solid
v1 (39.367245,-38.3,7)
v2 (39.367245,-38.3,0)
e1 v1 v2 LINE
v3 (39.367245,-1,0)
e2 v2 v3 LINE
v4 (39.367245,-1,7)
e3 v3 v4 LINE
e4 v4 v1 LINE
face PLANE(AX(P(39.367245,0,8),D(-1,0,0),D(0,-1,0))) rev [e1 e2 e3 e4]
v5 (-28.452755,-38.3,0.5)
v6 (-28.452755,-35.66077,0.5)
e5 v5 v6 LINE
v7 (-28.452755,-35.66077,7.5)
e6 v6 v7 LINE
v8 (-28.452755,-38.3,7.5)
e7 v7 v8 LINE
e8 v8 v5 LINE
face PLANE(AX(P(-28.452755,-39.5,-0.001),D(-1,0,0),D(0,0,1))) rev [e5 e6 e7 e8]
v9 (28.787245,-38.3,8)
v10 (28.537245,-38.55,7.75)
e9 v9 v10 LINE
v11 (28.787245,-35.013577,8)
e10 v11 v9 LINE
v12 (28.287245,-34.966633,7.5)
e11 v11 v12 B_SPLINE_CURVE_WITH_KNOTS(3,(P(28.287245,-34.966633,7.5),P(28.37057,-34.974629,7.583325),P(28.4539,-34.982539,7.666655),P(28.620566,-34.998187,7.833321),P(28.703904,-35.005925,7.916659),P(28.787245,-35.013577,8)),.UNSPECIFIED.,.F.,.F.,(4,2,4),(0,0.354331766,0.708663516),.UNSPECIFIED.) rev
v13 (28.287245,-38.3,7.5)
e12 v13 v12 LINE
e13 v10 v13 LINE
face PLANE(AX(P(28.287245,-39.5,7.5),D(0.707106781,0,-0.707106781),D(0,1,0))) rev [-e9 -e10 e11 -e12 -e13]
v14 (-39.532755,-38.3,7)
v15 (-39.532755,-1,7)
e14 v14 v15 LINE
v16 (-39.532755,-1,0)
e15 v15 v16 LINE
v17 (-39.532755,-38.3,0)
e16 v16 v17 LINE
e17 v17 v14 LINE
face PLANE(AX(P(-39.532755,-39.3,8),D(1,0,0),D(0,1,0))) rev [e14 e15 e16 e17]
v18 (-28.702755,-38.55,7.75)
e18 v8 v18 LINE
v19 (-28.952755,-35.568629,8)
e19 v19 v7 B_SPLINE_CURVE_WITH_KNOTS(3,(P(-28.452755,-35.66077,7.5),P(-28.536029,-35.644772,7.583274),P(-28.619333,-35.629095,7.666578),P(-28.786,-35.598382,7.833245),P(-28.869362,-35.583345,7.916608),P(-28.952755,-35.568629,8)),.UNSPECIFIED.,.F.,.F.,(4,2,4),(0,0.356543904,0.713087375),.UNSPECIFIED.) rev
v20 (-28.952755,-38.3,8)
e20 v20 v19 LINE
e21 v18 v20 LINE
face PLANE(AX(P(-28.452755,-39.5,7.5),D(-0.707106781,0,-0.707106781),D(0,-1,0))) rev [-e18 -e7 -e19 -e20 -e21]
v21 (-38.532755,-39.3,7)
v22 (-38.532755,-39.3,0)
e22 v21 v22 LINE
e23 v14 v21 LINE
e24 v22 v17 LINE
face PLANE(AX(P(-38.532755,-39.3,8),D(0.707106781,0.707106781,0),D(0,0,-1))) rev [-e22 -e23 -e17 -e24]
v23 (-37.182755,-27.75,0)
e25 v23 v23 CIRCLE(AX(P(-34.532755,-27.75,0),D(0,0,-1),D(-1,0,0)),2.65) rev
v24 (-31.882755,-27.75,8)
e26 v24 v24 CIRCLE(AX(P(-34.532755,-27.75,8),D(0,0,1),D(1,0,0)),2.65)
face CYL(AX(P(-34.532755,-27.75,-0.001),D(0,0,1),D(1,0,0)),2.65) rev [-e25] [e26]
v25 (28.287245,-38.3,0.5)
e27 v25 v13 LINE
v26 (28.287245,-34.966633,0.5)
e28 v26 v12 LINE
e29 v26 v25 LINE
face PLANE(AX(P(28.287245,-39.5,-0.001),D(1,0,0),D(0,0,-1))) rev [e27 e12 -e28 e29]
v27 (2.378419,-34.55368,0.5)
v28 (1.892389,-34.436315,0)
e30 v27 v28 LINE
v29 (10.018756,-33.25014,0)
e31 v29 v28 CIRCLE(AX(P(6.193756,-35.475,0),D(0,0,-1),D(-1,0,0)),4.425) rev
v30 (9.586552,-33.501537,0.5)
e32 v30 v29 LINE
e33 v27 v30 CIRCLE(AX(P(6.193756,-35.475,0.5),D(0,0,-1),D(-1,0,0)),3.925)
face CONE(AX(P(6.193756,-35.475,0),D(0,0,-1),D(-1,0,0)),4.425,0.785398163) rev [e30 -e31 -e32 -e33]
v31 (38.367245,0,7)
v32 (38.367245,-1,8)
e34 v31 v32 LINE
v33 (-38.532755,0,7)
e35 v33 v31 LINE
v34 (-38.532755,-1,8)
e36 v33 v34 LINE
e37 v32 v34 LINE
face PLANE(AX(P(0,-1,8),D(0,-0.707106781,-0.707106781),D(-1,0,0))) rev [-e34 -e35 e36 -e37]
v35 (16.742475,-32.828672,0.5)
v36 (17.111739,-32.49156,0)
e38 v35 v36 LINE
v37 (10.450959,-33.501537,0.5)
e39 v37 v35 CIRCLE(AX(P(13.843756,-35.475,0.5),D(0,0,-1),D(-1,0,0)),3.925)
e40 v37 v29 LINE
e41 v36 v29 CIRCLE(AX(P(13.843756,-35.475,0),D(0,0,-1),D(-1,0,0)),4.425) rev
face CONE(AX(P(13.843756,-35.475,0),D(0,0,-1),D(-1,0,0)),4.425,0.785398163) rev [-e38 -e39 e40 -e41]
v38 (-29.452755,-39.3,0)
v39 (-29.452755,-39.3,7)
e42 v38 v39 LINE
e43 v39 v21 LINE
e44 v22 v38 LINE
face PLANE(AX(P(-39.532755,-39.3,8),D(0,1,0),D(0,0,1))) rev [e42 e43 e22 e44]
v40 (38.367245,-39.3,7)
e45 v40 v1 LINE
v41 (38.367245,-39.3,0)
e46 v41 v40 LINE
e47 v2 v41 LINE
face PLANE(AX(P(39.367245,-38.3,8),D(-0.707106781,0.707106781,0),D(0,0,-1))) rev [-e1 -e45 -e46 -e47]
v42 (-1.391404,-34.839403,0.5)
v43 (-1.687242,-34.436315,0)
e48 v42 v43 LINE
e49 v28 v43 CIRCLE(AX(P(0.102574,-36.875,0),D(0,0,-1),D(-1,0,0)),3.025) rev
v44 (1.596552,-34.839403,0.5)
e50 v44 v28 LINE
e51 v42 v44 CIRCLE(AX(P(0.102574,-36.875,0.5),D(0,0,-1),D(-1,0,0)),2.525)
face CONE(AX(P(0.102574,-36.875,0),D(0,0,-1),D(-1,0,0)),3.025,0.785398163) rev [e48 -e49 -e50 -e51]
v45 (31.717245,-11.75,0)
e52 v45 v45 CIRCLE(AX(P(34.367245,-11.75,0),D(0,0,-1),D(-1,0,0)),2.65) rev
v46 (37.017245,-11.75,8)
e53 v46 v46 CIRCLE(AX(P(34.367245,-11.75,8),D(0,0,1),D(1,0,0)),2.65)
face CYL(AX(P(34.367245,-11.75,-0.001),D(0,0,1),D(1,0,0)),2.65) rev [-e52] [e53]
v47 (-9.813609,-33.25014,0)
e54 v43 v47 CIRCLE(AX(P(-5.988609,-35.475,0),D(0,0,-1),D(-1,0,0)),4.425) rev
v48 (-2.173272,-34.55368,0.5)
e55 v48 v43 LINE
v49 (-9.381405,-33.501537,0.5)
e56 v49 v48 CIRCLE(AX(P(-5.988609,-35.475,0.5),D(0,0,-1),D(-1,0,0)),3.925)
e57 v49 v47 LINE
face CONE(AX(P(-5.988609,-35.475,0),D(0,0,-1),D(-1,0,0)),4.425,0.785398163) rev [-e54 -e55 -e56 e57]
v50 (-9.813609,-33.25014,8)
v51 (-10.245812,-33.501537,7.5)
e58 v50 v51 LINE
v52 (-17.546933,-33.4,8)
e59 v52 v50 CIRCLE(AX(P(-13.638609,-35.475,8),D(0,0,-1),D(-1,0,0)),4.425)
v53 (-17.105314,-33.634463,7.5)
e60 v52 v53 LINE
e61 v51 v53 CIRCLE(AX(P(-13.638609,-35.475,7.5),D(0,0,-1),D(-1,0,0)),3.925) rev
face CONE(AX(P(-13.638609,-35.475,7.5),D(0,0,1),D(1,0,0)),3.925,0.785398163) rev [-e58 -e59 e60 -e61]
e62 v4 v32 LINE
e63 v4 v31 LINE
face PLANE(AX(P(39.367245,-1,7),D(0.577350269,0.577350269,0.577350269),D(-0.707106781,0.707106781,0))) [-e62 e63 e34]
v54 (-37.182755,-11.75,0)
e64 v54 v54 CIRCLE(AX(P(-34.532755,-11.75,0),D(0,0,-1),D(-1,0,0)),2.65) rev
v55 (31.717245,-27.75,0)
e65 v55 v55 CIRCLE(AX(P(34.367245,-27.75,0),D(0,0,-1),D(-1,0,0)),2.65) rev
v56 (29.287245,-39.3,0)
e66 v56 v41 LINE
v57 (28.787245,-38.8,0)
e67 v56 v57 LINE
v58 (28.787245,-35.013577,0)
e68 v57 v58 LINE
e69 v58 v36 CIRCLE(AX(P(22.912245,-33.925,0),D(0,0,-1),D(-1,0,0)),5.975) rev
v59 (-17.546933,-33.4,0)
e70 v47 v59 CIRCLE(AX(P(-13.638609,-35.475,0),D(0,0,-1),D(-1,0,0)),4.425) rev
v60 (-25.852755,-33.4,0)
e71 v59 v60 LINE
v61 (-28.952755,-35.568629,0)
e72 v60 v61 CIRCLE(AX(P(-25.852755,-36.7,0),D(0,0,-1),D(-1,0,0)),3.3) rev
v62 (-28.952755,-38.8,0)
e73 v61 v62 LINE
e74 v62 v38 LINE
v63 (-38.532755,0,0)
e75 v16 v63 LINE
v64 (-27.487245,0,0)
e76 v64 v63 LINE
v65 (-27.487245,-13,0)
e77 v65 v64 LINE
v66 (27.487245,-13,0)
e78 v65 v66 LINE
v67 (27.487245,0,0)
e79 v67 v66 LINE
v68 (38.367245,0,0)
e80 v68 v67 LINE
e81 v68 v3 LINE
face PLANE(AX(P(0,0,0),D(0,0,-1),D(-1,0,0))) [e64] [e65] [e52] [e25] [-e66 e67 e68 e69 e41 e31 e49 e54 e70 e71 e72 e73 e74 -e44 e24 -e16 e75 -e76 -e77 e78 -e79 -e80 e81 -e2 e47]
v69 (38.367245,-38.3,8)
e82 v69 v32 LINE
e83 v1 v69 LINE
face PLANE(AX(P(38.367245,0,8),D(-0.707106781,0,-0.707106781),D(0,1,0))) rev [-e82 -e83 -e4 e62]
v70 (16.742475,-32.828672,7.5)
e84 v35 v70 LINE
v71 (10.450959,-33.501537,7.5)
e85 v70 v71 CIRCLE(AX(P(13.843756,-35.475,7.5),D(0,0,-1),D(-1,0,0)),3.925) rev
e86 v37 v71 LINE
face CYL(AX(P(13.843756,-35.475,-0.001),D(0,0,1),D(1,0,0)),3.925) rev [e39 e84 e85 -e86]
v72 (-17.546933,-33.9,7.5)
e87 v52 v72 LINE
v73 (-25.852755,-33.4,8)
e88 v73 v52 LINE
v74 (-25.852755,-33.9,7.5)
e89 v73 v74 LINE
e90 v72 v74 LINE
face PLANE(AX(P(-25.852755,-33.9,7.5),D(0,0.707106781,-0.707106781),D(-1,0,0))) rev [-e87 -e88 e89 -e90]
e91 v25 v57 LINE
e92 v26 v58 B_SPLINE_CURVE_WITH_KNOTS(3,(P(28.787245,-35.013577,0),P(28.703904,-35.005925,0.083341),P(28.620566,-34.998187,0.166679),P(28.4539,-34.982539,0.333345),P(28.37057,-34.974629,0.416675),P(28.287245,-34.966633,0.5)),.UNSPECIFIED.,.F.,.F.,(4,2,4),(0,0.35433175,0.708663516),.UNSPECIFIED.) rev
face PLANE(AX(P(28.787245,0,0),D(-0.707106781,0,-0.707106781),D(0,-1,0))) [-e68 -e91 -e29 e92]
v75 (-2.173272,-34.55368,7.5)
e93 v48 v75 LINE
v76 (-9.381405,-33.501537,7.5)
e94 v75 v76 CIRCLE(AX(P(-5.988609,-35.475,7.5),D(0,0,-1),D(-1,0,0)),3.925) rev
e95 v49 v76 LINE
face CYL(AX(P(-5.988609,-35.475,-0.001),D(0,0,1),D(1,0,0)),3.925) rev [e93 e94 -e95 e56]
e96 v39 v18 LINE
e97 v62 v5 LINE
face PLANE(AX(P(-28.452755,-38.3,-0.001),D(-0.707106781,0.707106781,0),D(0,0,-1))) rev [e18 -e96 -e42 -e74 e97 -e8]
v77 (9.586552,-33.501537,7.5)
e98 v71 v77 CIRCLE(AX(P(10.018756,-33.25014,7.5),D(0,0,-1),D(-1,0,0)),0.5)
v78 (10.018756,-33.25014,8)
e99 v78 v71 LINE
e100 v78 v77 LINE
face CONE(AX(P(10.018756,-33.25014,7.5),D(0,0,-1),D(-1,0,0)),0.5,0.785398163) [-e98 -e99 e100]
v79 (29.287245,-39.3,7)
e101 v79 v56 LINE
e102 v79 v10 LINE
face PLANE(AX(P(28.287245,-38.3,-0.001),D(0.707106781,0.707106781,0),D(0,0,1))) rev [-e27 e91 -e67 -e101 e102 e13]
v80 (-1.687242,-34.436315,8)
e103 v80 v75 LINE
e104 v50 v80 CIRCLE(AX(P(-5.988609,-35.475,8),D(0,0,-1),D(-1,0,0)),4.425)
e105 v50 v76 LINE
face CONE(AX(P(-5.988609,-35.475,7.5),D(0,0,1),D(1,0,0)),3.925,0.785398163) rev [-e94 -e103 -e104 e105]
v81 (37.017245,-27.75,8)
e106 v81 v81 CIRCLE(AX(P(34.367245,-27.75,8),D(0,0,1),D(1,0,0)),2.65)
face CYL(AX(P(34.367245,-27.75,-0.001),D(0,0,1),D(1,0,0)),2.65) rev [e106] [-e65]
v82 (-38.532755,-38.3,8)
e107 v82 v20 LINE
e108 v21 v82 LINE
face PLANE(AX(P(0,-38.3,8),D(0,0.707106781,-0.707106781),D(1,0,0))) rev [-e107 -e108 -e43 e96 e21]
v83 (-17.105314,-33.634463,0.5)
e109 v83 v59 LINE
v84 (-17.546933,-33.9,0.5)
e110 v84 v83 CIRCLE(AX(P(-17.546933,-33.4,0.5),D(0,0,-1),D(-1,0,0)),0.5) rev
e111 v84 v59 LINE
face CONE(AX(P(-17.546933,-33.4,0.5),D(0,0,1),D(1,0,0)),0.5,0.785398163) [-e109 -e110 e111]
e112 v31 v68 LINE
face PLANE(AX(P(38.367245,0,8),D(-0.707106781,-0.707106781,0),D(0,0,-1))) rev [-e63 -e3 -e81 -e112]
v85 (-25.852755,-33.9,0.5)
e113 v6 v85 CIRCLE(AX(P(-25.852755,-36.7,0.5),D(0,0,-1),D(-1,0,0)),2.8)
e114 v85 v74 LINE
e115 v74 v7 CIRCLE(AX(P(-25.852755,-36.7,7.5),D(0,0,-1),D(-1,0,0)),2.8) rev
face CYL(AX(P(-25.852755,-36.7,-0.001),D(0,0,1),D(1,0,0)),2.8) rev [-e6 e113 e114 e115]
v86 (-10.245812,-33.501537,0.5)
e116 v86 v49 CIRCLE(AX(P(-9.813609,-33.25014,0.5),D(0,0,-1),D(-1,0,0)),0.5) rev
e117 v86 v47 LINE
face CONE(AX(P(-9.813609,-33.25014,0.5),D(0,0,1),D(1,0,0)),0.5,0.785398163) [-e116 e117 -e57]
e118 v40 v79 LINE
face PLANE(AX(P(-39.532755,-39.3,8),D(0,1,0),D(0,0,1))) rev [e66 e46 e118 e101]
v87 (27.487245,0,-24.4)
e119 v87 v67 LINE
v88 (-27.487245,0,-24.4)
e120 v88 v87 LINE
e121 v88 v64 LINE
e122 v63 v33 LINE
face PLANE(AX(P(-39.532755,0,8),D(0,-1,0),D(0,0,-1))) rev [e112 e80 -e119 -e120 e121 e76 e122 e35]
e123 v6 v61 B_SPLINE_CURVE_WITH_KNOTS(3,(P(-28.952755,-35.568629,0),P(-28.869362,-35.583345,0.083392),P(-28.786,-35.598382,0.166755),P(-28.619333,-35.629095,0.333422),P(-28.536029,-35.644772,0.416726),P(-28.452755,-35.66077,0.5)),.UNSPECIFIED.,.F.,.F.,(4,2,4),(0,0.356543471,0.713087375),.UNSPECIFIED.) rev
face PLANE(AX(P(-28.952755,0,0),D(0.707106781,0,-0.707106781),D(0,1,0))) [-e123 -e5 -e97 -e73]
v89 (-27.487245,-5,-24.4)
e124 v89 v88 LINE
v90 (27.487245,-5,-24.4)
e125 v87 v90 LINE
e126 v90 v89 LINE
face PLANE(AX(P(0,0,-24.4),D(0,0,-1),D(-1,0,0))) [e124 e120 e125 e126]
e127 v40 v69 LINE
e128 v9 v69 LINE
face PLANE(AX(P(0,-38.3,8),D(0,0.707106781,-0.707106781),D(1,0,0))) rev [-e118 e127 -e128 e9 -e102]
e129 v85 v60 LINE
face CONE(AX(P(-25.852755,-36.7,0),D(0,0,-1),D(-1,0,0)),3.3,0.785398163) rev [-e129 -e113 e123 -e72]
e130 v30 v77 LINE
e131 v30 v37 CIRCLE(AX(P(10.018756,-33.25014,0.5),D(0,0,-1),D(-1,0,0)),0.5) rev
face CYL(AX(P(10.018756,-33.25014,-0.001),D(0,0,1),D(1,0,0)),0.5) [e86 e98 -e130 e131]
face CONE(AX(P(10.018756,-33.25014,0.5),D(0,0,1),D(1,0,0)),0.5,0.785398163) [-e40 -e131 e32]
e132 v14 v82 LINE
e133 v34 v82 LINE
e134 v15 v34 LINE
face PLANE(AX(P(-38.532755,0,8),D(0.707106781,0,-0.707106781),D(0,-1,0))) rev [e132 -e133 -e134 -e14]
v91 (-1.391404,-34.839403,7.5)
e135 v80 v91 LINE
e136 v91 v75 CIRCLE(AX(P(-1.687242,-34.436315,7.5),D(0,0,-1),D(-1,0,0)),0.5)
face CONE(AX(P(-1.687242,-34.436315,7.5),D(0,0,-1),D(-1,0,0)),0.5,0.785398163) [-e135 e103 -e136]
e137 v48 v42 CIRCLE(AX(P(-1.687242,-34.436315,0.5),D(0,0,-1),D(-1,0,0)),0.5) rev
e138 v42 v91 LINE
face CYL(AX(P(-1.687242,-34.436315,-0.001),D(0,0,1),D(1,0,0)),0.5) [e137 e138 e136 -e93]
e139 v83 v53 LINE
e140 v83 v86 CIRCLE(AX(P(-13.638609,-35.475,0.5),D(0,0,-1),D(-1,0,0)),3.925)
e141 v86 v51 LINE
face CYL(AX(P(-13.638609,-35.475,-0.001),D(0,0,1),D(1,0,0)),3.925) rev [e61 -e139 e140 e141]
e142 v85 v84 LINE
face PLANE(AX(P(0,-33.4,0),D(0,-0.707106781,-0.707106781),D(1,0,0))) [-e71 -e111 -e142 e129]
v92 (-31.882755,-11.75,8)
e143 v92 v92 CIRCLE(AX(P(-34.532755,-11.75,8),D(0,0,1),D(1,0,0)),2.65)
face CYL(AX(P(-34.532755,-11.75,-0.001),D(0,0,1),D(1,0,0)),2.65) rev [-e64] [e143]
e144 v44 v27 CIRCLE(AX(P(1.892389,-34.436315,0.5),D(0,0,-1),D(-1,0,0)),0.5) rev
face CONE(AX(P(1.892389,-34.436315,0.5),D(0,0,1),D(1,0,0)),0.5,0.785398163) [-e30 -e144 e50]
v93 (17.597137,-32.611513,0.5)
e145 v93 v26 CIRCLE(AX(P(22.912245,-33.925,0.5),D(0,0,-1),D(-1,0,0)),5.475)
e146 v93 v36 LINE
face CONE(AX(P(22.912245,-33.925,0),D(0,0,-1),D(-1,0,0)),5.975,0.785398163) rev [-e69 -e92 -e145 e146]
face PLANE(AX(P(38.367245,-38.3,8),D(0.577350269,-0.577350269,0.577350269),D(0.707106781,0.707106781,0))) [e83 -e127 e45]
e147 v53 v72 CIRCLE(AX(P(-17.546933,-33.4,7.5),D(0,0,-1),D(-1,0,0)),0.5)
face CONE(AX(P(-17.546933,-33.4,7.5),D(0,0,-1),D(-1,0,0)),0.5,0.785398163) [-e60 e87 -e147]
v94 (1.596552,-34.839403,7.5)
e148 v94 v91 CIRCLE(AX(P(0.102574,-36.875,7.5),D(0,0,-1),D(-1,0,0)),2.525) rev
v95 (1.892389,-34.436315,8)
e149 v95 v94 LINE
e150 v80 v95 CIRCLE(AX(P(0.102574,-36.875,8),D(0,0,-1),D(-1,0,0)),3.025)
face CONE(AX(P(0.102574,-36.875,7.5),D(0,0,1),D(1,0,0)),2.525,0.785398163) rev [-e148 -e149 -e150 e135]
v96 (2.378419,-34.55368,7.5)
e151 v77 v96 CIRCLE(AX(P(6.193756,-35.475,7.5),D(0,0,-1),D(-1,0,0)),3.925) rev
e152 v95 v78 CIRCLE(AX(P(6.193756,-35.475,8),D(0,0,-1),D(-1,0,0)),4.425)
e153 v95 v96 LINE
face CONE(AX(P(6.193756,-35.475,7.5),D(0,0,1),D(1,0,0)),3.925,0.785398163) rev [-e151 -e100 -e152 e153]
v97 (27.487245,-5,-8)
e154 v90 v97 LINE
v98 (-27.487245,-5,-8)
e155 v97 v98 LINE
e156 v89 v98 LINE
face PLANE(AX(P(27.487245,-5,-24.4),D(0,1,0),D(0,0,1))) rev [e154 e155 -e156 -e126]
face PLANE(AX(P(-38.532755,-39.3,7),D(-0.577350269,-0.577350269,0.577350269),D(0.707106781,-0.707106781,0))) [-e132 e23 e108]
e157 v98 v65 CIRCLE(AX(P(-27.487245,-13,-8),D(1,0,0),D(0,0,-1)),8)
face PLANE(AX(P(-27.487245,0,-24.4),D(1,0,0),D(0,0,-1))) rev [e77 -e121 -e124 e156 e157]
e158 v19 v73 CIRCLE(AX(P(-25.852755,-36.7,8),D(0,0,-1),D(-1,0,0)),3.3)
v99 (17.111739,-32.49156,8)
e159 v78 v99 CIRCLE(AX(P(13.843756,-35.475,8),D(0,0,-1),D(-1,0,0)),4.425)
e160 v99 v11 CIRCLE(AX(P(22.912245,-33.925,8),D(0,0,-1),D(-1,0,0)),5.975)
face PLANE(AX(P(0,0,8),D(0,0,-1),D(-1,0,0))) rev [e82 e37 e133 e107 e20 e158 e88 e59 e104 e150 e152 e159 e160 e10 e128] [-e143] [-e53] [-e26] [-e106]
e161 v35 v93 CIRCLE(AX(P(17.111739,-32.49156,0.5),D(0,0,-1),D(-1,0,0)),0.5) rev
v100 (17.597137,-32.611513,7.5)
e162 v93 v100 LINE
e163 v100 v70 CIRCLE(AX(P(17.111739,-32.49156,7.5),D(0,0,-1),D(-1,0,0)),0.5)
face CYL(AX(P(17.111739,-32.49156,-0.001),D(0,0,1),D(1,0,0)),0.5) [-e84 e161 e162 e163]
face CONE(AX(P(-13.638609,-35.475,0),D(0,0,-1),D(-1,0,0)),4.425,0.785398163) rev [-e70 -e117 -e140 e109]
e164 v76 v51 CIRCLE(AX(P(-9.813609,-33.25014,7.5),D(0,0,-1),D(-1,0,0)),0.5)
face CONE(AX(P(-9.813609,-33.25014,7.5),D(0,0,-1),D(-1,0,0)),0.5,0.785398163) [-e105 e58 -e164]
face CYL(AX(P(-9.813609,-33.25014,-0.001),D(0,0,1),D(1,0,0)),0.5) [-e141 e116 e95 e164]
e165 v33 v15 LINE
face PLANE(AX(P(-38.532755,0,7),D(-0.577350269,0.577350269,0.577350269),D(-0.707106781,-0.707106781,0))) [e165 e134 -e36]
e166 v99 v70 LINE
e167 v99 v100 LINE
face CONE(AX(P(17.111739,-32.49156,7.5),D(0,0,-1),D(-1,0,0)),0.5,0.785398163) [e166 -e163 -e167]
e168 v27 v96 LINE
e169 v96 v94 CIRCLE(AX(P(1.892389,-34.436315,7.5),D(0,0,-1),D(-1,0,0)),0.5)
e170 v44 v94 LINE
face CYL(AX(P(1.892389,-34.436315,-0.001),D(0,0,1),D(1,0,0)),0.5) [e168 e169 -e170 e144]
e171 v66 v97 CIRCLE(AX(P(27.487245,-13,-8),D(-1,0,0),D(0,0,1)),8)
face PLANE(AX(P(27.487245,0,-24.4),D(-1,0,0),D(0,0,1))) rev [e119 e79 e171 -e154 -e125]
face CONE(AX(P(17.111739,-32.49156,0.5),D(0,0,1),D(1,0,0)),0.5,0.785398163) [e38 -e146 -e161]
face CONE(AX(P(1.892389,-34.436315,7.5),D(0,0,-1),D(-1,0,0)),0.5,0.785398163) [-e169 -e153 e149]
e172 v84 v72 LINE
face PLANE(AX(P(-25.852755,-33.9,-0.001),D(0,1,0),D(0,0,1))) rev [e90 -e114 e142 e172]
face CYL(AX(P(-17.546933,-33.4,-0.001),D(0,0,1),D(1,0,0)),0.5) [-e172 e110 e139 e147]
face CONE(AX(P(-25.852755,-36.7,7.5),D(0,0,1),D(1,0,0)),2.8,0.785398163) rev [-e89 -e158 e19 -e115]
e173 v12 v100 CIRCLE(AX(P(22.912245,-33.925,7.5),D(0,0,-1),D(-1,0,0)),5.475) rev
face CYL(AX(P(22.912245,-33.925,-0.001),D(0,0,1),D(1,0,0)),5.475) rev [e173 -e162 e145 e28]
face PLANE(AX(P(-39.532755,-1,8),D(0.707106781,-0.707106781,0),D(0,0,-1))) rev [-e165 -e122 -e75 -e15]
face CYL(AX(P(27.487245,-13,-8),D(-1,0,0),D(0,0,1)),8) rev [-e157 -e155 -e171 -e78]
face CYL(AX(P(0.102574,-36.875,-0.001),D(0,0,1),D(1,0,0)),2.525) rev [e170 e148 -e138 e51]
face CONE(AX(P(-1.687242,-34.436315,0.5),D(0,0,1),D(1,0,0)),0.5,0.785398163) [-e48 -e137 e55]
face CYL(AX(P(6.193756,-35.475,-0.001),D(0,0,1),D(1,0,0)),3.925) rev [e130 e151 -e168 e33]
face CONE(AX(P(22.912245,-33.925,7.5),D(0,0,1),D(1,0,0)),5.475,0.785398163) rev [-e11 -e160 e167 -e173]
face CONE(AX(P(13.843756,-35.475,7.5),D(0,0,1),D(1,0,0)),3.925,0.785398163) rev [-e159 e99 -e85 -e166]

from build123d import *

# Parameters (mm, degrees)
SKETCH4_W           = 78.9
SKETCH4_H           = 39.3
BOSS_EXTRUDE2_DEPTH = 8
CUT_EXTRUDE2_REACH  = 58.315
CUT_EXTRUDE3_REACH  = 58.315
SKETCH7_R           = 2.65
CHAMFER3_SIZE       = 1
CHAMFER4_SIZE       = 0.5
SKETCH8_W           = 54.974490404
SKETCH8_H           = 5
BOSS_EXTRUDE3_DEPTH = 24.4
FILLET1_R           = 8


with BuildPart() as part:
    # Sketch4 → Boss-Extrude2 (new body)
    with BuildSketch(Plane.XY):
        with Locations((-0.082754798, -19.65)):
            Rectangle(SKETCH4_W, SKETCH4_H)
    extrude(amount=BOSS_EXTRUDE2_DEPTH)

    # Sketch6 → Cut-Extrude2 (cut, up to next)
    with BuildSketch(Plane.XY.offset(8), mode=Mode.PRIVATE) as cut_extrude2_sk1:
        with BuildLine():
            Line((28.287245202, -39.5), (28.287245202, -34.966633333))
            ThreePointArc((28.287245202, -34.966633333), (24.090185885, -28.57821772), (17.597136747, -32.611513376))
            ThreePointArc((17.597136747, -32.611513376), (17.234869858, -32.976161871), (16.742475109, -32.828672095))
            ThreePointArc((16.742475109, -32.828672095), (13.426365224, -31.57225608), (10.450959192, -33.501537013))
            ThreePointArc((10.450959192, -33.501537013), (10.018755802, -33.750140454), (9.586552412, -33.501537013))
            ThreePointArc((9.586552412, -33.501537013), (5.626846324, -31.591156717), (2.378419018, -34.553680172))
            ThreePointArc((2.378419018, -34.553680172), (2.064006845, -34.905939189), (1.596551631, -34.839403086))
            ThreePointArc((1.596551631, -34.839403086), (0.102573651, -34.35), (-1.39140433, -34.839403086))
            ThreePointArc((-1.39140433, -34.839403086), (-1.858859544, -34.905939189), (-2.173271717, -34.553680172))
            ThreePointArc((-2.173271717, -34.553680172), (-5.421699023, -31.591156717), (-9.381405111, -33.501537013))
            ThreePointArc((-9.381405111, -33.501537013), (-9.813608501, -33.750140454), (-10.245811891, -33.501537013))
            ThreePointArc((-10.245811891, -33.501537013), (-13.71465449, -31.550736756), (-17.105314368, -33.634463277))
            ThreePointArc((-17.105314368, -33.634463277), (-17.289281672, -33.828504165), (-17.54693295, -33.9))
            Line((-17.54693295, -33.9), (-25.852754798, -33.9))
            ThreePointArc((-25.852754798, -33.9), (-27.422811269, -34.381612052), (-28.452754798, -35.660769515))
            Line((-28.452754798, -35.660769515), (-28.452754798, -39.5))
            Line((-28.452754798, -39.5), (28.287245202, -39.5))
        make_face()
    cut_extrude2_tool1 = extrude(cut_extrude2_sk1.sketch, amount=-CUT_EXTRUDE2_REACH, mode=Mode.PRIVATE) & part.part
    add(cut_extrude2_tool1.solids().sort_by_distance((2.671043, -35.689379, 8))[0], mode=Mode.SUBTRACT)

    # Sketch7 → Cut-Extrude3 (cut, up to next)
    with BuildSketch(Plane.XY.offset(8), mode=Mode.PRIVATE) as cut_extrude3_sk1:
        with Locations((-34.532754798, -11.75)):
            Circle(SKETCH7_R)
    cut_extrude3_tool1 = extrude(cut_extrude3_sk1.sketch, amount=-CUT_EXTRUDE3_REACH, mode=Mode.PRIVATE) & part.part
    # Sketch7 → Cut-Extrude3 (cut, up to next)
    with BuildSketch(Plane.XY.offset(8), mode=Mode.PRIVATE) as cut_extrude3_sk2:
        with Locations((-34.532754798, -27.75)):
            Circle(SKETCH7_R)
    cut_extrude3_tool2 = extrude(cut_extrude3_sk2.sketch, amount=-CUT_EXTRUDE3_REACH, mode=Mode.PRIVATE) & part.part
    # Sketch7 → Cut-Extrude3 (cut, up to next)
    with BuildSketch(Plane.XY.offset(8), mode=Mode.PRIVATE) as cut_extrude3_sk3:
        with Locations((34.367245202, -11.75)):
            Circle(SKETCH7_R)
    cut_extrude3_tool3 = extrude(cut_extrude3_sk3.sketch, amount=-CUT_EXTRUDE3_REACH, mode=Mode.PRIVATE) & part.part
    # Sketch7 → Cut-Extrude3 (cut, up to next)
    with BuildSketch(Plane.XY.offset(8), mode=Mode.PRIVATE) as cut_extrude3_sk4:
        with Locations((34.367245202, -27.75)):
            Circle(SKETCH7_R)
    cut_extrude3_tool4 = extrude(cut_extrude3_sk4.sketch, amount=-CUT_EXTRUDE3_REACH, mode=Mode.PRIVATE) & part.part
    add(cut_extrude3_tool1.solids().sort_by_distance((-34.532755, -11.75, 8))[0], mode=Mode.SUBTRACT)
    add(cut_extrude3_tool2.solids().sort_by_distance((-34.532755, -27.75, 8))[0], mode=Mode.SUBTRACT)
    add(cut_extrude3_tool3.solids().sort_by_distance((34.367245, -11.75, 8))[0], mode=Mode.SUBTRACT)
    add(cut_extrude3_tool4.solids().sort_by_distance((34.367245, -27.75, 8))[0], mode=Mode.SUBTRACT)

    # Chamfer3
    chamfer3_edges = [part.edges().sort_by_distance(p)[0] for p in [
        (-0.082754798, 0, 8),
        (-39.532754798, -19.65, 8),
        (33.827245202, -39.3, 8),
        (-28.452754798, -39.3, 4),
        (28.287245202, -39.3, 4),
        (-33.992754798, -39.3, 8),
        (39.367245202, -19.65, 8),
        (-39.532754798, -39.3, 4),
        (-39.532754798, 0, 4),
        (39.367245202, 0, 4),
        (39.367245202, -39.3, 4),
    ]]
    chamfer(chamfer3_edges, length=CHAMFER3_SIZE)

    # Chamfer4
    chamfer4_edges = [part.edges().sort_by_distance(p)[0] for p in [
        (-27.422811269, -34.381612052, 0),
        (-21.699843874, -33.9, 0),
        (-17.289281672, -33.828504165, 0),
        (-13.71465449, -31.550736756, 0),
        (-9.813608501, -33.750140454, 0),
        (-5.421699023, -31.591156717, 0),
        (-1.858859544, -34.905939189, 0),
        (0.102573651, -34.35, 0),
        (2.064006845, -34.905939189, 0),
        (24.090185885, -28.57821772, 0),
        (5.626846324, -31.591156717, 0),
        (17.234869858, -32.976161871, 0),
        (10.018755802, -33.750140454, 0),
        (13.426365224, -31.57225608, 0),
    ]]
    chamfer(chamfer4_edges, length=CHAMFER4_SIZE - 0.0001)  # a hair under: the kernel refuses the full size
    chamfer4_2_edges = [part.edges().sort_by_distance(p)[0] for p in [
        (28.287245202, -37.41718435, 0),
    ]]
    chamfer(chamfer4_2_edges, length=CHAMFER4_SIZE)
    chamfer4_3_edges = [part.edges().sort_by_distance(p)[0] for p in [
        (-27.422811269, -34.381612052, 8),
        (-21.699843874, -33.9, 8),
        (-17.289281672, -33.828504165, 8),
        (-13.71465449, -31.550736756, 8),
        (-9.813608501, -33.750140454, 8),
        (-5.421699023, -31.591156717, 8),
        (-1.858859544, -34.905939189, 8),
        (0.102573651, -34.35, 8),
        (2.064006845, -34.905939189, 8),
        (24.090185885, -28.57821772, 8),
        (5.626846324, -31.591156717, 8),
        (17.234869858, -32.976161871, 8),
        (10.018755802, -33.750140454, 8),
        (13.426365224, -31.57225608, 8),
    ]]
    chamfer(chamfer4_3_edges, length=CHAMFER4_SIZE - 0.0001)  # a hair under: the kernel refuses the full size
    chamfer4_4_edges = [part.edges().sort_by_distance(p)[0] for p in [
        (28.287245202, -37.41718435, 8),
    ]]
    chamfer(chamfer4_4_edges, length=CHAMFER4_SIZE)
    chamfer4_5_edges = [part.edges().sort_by_distance(p)[0] for p in [
        (-28.452754798, -36.980384758, 0),
    ]]
    chamfer(chamfer4_5_edges, length=CHAMFER4_SIZE - 0.0001)  # a hair under: the kernel refuses the full size
    chamfer4_6_edges = [part.edges().sort_by_distance(p)[0] for p in [
        (-28.452754798, -36.980384758, 8),
    ]]
    chamfer(chamfer4_6_edges, length=CHAMFER4_SIZE - 0.0001)  # a hair under: the kernel refuses the full size

    # Sketch8 → Boss-Extrude3 (add)
    with BuildSketch(Plane(origin=(0, 0, 0), x_dir=(-1, 0, 0), z_dir=(0, 0, -1))):
        with Locations((0, -2.5)):
            Rectangle(SKETCH8_W, SKETCH8_H)
    extrude(amount=BOSS_EXTRUDE3_DEPTH)

    # Fillet1
    fillet1_edges = [part.edges().sort_by_distance(p)[0] for p in [
        (0, -5, 0),
    ]]
    fillet(fillet1_edges, radius=FILLET1_R)


solid = part.part
